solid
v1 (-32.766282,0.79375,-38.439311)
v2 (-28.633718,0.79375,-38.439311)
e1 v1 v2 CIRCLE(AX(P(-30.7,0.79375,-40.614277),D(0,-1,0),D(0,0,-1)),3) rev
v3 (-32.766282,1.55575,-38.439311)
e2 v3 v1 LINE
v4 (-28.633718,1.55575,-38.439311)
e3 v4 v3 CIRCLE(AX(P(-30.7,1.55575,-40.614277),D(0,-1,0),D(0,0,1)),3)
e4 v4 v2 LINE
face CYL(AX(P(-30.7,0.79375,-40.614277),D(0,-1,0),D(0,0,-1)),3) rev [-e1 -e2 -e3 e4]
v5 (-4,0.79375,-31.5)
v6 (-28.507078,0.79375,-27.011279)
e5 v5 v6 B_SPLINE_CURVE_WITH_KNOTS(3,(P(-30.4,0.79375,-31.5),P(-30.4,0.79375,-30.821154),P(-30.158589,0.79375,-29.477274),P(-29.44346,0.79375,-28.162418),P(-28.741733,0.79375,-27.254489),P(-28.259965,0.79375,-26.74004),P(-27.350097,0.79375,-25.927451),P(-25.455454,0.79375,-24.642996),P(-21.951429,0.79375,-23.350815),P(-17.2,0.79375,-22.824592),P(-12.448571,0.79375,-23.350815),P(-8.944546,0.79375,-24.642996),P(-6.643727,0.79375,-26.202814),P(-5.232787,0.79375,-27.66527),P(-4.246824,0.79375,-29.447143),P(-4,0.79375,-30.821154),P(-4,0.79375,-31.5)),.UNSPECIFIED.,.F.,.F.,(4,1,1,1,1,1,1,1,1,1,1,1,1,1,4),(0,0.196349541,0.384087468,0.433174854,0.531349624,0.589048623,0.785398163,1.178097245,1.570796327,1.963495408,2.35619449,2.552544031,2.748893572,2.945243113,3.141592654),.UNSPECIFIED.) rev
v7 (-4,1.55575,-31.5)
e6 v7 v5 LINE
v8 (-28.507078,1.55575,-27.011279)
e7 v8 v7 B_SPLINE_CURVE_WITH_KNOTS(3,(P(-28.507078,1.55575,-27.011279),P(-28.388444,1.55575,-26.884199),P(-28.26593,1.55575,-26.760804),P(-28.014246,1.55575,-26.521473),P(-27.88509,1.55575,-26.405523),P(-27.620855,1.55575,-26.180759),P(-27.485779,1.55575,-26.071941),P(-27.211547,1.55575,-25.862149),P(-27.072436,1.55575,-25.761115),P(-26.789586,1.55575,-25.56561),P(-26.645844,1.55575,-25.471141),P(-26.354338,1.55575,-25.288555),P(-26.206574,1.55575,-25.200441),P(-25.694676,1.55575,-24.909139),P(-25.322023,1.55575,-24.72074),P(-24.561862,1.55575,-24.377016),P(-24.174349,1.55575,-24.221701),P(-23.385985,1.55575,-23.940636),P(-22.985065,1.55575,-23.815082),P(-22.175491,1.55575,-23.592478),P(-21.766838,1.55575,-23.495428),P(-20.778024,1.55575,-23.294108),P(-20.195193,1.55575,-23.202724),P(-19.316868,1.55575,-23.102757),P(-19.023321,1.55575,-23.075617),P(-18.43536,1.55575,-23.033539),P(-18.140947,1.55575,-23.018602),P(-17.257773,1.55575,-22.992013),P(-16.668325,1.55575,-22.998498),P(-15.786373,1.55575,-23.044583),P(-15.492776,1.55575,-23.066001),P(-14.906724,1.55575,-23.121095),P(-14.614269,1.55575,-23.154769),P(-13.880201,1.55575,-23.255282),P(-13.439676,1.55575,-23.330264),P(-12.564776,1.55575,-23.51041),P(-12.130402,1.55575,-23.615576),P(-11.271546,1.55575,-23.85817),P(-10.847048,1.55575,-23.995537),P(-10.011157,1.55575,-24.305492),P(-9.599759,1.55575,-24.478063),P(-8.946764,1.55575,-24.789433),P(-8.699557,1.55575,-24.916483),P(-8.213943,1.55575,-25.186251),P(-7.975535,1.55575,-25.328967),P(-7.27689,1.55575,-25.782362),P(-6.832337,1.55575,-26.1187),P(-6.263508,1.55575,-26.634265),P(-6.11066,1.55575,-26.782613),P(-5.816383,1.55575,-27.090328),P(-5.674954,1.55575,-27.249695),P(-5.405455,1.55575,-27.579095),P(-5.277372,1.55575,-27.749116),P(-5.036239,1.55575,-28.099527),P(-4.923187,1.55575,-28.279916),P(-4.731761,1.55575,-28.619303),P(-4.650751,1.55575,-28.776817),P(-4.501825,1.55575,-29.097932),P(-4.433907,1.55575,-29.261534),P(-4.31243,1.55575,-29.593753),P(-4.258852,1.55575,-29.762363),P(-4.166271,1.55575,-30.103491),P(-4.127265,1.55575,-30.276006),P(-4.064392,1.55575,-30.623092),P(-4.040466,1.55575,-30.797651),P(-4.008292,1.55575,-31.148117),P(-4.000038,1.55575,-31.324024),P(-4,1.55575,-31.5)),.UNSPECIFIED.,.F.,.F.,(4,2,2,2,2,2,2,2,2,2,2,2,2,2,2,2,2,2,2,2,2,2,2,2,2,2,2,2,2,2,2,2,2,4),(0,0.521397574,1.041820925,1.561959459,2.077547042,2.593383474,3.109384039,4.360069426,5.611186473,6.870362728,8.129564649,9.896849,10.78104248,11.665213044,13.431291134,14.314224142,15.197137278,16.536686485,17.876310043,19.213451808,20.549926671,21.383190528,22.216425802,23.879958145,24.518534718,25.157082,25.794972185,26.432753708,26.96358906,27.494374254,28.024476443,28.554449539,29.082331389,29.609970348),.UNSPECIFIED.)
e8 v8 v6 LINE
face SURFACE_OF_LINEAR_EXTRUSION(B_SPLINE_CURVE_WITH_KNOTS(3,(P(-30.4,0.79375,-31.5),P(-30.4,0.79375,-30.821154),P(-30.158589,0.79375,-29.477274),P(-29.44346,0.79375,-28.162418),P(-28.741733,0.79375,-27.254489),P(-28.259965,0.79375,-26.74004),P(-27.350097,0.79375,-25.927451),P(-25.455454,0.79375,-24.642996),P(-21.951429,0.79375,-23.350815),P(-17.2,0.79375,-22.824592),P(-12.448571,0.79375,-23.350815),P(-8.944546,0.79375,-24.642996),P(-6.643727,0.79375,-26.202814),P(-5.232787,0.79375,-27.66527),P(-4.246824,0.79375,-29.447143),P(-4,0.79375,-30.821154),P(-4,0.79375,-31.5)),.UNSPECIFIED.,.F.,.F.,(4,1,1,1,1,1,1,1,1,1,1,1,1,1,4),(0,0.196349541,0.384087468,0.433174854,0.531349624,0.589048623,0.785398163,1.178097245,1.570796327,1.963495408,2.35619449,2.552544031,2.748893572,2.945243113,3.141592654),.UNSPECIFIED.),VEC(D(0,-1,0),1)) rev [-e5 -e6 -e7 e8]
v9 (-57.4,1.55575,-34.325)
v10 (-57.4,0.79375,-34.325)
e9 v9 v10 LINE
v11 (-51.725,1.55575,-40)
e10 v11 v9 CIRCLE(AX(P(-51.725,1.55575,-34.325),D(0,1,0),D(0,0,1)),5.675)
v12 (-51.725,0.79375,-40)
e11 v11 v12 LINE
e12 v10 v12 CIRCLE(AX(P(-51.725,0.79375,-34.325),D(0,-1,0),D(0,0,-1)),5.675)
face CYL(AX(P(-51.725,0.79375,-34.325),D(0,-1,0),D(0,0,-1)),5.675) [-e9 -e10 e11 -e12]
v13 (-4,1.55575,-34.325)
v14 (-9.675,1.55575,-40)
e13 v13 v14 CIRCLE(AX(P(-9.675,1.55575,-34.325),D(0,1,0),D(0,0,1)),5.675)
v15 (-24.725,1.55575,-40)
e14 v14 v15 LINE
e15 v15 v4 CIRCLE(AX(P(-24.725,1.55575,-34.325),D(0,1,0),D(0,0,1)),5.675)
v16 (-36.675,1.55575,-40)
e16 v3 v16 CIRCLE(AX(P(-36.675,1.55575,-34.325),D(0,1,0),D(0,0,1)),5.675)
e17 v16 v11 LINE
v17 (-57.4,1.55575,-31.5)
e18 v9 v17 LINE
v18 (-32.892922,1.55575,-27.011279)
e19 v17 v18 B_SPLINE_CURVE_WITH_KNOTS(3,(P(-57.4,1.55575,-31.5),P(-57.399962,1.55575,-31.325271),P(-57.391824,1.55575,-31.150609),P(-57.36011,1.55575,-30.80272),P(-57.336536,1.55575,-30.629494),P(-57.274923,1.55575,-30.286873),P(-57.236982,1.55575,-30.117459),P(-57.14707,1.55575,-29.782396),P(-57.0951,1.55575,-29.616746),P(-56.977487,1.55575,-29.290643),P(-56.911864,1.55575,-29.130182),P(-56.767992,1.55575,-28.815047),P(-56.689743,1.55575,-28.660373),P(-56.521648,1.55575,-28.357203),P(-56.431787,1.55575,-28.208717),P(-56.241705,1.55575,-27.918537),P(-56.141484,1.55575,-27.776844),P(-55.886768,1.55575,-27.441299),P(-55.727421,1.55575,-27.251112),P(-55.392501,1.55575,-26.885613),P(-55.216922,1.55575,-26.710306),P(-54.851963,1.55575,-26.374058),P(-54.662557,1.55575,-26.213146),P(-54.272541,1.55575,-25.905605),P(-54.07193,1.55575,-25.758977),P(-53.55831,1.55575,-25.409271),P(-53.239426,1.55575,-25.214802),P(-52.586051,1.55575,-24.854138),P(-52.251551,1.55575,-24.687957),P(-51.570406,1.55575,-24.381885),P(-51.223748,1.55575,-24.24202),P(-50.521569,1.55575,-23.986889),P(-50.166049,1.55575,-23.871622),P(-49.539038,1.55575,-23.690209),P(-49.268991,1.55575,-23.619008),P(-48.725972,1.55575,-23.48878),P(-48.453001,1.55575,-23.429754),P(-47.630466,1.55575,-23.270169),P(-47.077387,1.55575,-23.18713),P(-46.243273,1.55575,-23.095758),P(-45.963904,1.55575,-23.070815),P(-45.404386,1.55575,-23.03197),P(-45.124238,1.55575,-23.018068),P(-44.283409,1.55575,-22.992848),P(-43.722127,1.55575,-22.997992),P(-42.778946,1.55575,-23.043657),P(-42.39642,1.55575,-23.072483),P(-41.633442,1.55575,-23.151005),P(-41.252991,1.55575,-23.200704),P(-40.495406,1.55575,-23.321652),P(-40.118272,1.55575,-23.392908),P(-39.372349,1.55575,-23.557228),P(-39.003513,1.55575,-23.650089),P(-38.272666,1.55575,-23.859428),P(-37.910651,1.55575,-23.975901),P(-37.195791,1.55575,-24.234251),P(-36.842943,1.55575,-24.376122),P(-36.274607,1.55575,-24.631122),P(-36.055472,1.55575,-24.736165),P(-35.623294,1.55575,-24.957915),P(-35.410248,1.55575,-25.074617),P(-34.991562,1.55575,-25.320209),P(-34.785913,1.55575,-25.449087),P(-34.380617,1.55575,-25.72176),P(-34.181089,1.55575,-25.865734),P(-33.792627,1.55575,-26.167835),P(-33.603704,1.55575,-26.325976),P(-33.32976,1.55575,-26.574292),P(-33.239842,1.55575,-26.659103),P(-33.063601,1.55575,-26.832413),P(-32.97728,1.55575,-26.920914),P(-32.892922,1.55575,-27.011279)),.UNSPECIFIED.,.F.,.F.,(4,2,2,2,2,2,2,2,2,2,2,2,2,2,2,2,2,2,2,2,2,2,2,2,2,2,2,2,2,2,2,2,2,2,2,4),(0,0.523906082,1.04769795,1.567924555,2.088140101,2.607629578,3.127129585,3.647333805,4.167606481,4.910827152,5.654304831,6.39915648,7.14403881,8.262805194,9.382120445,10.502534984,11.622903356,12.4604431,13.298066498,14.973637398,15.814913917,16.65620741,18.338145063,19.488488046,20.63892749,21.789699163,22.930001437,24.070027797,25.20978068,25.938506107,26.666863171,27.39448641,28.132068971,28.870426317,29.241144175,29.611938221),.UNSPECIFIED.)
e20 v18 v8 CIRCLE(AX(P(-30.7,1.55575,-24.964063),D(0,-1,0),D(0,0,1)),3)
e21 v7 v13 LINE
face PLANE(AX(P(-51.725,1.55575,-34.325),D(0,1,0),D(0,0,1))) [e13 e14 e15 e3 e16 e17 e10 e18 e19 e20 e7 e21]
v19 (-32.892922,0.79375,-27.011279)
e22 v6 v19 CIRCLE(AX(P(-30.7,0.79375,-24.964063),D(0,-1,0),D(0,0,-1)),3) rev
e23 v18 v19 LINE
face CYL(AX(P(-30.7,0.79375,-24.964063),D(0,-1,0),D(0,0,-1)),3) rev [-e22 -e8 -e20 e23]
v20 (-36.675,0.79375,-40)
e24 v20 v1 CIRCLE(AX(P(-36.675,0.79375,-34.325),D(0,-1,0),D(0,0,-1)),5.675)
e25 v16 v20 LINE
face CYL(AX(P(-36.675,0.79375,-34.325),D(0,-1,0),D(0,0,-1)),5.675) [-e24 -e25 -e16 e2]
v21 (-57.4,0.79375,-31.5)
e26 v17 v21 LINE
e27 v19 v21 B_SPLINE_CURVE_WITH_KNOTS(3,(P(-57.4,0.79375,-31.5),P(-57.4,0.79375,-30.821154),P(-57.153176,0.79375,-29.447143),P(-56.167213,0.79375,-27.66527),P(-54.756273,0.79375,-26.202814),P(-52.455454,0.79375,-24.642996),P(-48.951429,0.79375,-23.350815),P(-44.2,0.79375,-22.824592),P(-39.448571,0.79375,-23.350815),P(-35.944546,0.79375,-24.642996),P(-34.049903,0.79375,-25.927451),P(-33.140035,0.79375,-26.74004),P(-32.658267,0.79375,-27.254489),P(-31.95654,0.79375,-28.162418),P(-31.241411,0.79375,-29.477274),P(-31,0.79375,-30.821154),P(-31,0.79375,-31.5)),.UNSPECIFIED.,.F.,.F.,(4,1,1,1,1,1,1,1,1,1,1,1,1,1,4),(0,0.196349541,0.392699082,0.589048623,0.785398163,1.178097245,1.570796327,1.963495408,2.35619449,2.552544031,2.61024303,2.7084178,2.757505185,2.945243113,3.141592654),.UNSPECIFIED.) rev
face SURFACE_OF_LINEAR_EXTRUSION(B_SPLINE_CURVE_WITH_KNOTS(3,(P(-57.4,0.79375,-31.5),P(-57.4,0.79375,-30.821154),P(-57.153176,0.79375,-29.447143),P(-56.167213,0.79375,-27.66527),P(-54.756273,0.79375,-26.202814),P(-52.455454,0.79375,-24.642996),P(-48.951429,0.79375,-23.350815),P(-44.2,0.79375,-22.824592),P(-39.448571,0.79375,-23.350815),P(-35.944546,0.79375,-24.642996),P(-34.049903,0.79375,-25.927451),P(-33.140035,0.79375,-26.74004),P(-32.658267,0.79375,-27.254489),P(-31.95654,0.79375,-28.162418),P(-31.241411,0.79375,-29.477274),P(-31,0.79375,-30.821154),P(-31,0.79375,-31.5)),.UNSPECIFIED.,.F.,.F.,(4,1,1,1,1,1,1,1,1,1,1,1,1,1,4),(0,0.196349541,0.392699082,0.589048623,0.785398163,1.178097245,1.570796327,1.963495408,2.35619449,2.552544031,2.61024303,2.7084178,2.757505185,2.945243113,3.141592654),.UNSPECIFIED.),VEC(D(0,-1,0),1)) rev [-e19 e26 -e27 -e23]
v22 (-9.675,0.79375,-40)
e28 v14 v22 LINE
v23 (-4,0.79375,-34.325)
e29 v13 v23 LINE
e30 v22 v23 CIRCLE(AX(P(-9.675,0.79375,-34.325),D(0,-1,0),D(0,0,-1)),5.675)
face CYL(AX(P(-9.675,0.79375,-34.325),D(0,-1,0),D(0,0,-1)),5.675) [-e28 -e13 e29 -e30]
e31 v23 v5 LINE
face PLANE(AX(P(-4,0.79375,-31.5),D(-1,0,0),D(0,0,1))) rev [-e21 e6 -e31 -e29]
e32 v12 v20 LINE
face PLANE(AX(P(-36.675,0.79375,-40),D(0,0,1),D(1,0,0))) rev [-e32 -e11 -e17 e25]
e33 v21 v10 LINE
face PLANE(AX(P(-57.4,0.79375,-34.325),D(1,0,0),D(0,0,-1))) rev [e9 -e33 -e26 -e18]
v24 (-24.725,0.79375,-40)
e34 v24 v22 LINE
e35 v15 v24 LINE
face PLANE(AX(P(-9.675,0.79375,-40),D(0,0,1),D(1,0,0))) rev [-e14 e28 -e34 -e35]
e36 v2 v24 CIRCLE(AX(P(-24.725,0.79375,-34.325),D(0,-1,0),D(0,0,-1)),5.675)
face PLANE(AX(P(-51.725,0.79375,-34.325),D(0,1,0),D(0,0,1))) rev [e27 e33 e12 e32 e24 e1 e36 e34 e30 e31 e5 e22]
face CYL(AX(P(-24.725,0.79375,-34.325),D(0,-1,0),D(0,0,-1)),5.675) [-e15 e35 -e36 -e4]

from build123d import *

# Parameters (mm, degrees)
SKETCH4_W                      = 118.3
SKETCH4_H                      = 40.5
BOSS_EXTRUDE1_DEPTH            = 12.7
CUT_EXTRUDE1_DEPTH             = 75.078168174
FILLET1_R                      = 3.175
LPATTERN1_COUNT                = 2
LPATTERN1_PITCH                = 27
FILLET1_OF_LPATTERN1_R         = 3.175
MIRROR1_DEPTH                  = 12.7
SKETCH8_R                      = 0.85
CUT_EXTRUDE2_DEPTH             = 75.078168329
MIRROR3_COPY_1_SKETCH_R        = 0.85
MIRROR3_COPY_1_DEPTH           = 75.078168329
SKETCH14_W                     = 118.3
SKETCH14_H                     = 0.96
SKETCH14_W_2                   = 4.5
SKETCH14_H_2                   = 40.5
CUT_EXTRUDE7_DEPTH             = 0.1
CUT_EXTRUDE8_DEPTH             = 2.35
MIRROR14_COPY_1_DEPTH          = 2.35
MIRROR16_COPY_1_DEPTH          = 2.35
MIRROR16_COPY_2_DEPTH          = 2.35
MIRROR16_COPY_3_DEPTH          = 2.35
CUT_EXTRUDE10_DEPTH            = 75.061089804
SKETCH20_W                     = 127.8
SKETCH20_H                     = 85.5
BOSS_EXTRUDE2_DEPTH            = 3.175
SKETCH22_W                     = 127.8
SKETCH22_H                     = 85.5
CUT_EXTRUDE11_DEPTH            = 78.923440062
CUT_EXTRUDE12_DEPTH            = 77.947080029
F_0_80_TAPPED_HOLE1_D          = 1.19126
MIRROR19_COPY_1_DEPTH          = 77.947080029
MIRROR19_COPY_2_D              = 1.19126
SKETCH26_W                     = 127.8
SKETCH26_H                     = 0.96
CUT_EXTRUDE13_DEPTH            = 3.175
SKETCH27_W                     = 127.8
SKETCH27_H                     = 0.96
CUT_EXTRUDE14_DEPTH            = 3.175
SKETCH29_W                     = 3.175
SKETCH29_H                     = 19.77
CUT_EXTRUDE15_DEPTH            = 0.82
F_0_80_TAPPED_HOLE2_AT_2_COUNT = 2
F_0_80_TAPPED_HOLE2_AT_2_PITCH = 10
SKETCH36_R                     = 0.8
CUT_EXTRUDE16_DEPTH            = 10
FILLET2_R                      = 1.5
FILLET3_R                      = 1.5
F_0_80_TAPPED_HOLE5_AT_2_COUNT = 2
F_0_80_TAPPED_HOLE5_AT_2_PITCH = 10
BOSS_EXTRUDE3_DEPTH            = 0.79375
SKETCH39_W                     = 144.663992048
SKETCH39_H                     = 99.796260463
CUT_EXTRUDE17_DEPTH            = 10
BOSS_EXTRUDE4_DEPTH            = 0.762
SKETCH42_W                     = 65.404927097
SKETCH42_H                     = 32.798348424
CUT_EXTRUDE18_DEPTH            = 10.762


# Read off the part's stored shape, not the designer's step: Mirror1
with BuildPart() as part:
    # Sketch4 → Boss-Extrude1 (new body)
    with BuildSketch(Plane(origin=(0, 0, 0), x_dir=(1, 0, 0), z_dir=(0, 1, 0))):
        with Locations((0, 22.5)):
            Rectangle(SKETCH4_W, SKETCH4_H)
    extrude(amount=BOSS_EXTRUDE1_DEPTH)

    # Sketch5 → Cut-Extrude1 (cut, through all)
    with BuildSketch(Plane(origin=(0, 12.7, 0), x_dir=(1, 0, 0), z_dir=(0, 1, 0))):
        with BuildLine():
            Line((-54.9, 13.5), (-54.9, 7.5))
            Line((-54.9, 7.5), (-33.5, 7.5))
            Line((-33.5, 7.5), (-33.5, 13.5))
            add(Edge.make_bspline(
                [(-33.5, 13.5), (-33.5, 19.5), (-44.2, 19.5), (-54.9, 19.5), (-54.9, 13.5)],
                knots=[3.141592654, 3.141592654, 3.141592654, 4.71238898, 4.71238898, 6.283185307, 6.283185307, 6.283185307], degree=2, weights=[1, 0.707106781, 1, 0.707106781, 1]))
        make_face()
        with BuildLine():
            Line((-54.9, 37.5), (-33.5, 37.5))
            Line((-33.5, 37.5), (-33.5, 31.5))
            add(Edge.make_bspline(
                [(-54.9, 31.5), (-54.9, 25.5), (-44.2, 25.5), (-33.5, 25.5), (-33.5, 31.5)],
                knots=[0, 0, 0, 1.570796327, 1.570796327, 3.141592654, 3.141592654, 3.141592654], degree=2, weights=[1, 0.707106781, 1, 0.707106781, 1]))
            Line((-54.9, 31.5), (-54.9, 37.5))
        make_face()
    cut_extrude1 = extrude(amount=-CUT_EXTRUDE1_DEPTH, mode=Mode.SUBTRACT)

    # Fillet1
    fillet1_edges = [part.edges().sort_by_distance(p)[0] for p in [
        (-33.5, 6.35, -7.5),
        (-54.9, 6.35, -7.5),
        (-54.9, 6.35, -37.5),
        (-33.5, 6.35, -37.5),
    ]]
    fillet(fillet1_edges, radius=FILLET1_R)

    # LPattern1: Cut-Extrude1 ×2
    with Locations(*[(i * LPATTERN1_PITCH, 0, 0) for i in range(1, LPATTERN1_COUNT)]):
        add(cut_extrude1, mode=Mode.SUBTRACT)

    # Fillet1 of LPattern1
    fillet1_of_lpattern1_edges = [part.edges().sort_by_distance(p)[0] for p in [
        (-6.5, 6.35, -7.5),
        (-27.9, 6.35, -7.5),
        (-27.9, 6.35, -37.5),
        (-6.5, 6.35, -37.5),
    ]]
    fillet(fillet1_of_lpattern1_edges, radius=FILLET1_OF_LPATTERN1_R)

    # Mirror1 outline → Mirror1 (cut)
    with BuildSketch(Plane(origin=(0, 0, 0), x_dir=(1, 0, 0), z_dir=(0, 1, 0))):
        with BuildLine():
            add(Edge.make_bspline(
                [(33.5, 13.5), (33.5, 19.5), (44.2, 19.5), (54.9, 19.5), (54.9, 13.5)],
                knots=[3.141592654, 3.141592654, 3.141592654, 4.71238898, 4.71238898, 6.283185307, 6.283185307, 6.283185307], degree=2, weights=[1, 0.707106781, 1, 0.707106781, 1]))
            Line((33.5, 13.5), (33.5, 10.675))
            ThreePointArc((33.5, 10.675), (34.42993597, 8.42993597), (36.675, 7.5))
            Line((36.675, 7.5), (51.725, 7.5))
            ThreePointArc((51.725, 7.5), (53.97006403, 8.42993597), (54.9, 10.675))
            Line((54.9, 10.675), (54.9, 13.5))
        make_face()
        with BuildLine():
            add(Edge.make_bspline(
                [(54.9, 31.5), (54.9, 25.5), (44.2, 25.5), (33.5, 25.5), (33.5, 31.5)],
                knots=[0, 0, 0, 1.570796327, 1.570796327, 3.141592654, 3.141592654, 3.141592654], degree=2, weights=[1, 0.707106781, 1, 0.707106781, 1]))
            Line((54.9, 31.5), (54.9, 34.325))
            ThreePointArc((54.9, 34.325), (53.97006403, 36.57006403), (51.725, 37.5))
            Line((51.725, 37.5), (36.675, 37.5))
            ThreePointArc((36.675, 37.5), (34.42993597, 36.57006403), (33.5, 34.325))
            Line((33.5, 34.325), (33.5, 31.5))
        make_face()
        with BuildLine():
            add(Edge.make_bspline(
                [(6.5, 13.5), (6.5, 19.5), (17.2, 19.5), (27.9, 19.5), (27.9, 13.5)],
                knots=[3.141592654, 3.141592654, 3.141592654, 4.71238898, 4.71238898, 6.283185307, 6.283185307, 6.283185307], degree=2, weights=[1, 0.707106781, 1, 0.707106781, 1]))
            Line((6.5, 13.5), (6.5, 10.675))
            ThreePointArc((6.5, 10.675), (7.42993597, 8.42993597), (9.675, 7.5))
            Line((9.675, 7.5), (24.725, 7.5))
            ThreePointArc((24.725, 7.5), (26.97006403, 8.42993597), (27.9, 10.675))
            Line((27.9, 10.675), (27.9, 13.5))
        make_face()
        with BuildLine():
            add(Edge.make_bspline(
                [(27.9, 31.5), (27.9, 25.5), (17.2, 25.5), (6.5, 25.5), (6.5, 31.5)],
                knots=[0, 0, 0, 1.570796327, 1.570796327, 3.141592654, 3.141592654, 3.141592654], degree=2, weights=[1, 0.707106781, 1, 0.707106781, 1]))
            Line((27.9, 31.5), (27.9, 34.325))
            ThreePointArc((27.9, 34.325), (26.97006403, 36.57006403), (24.725, 37.5))
            Line((24.725, 37.5), (9.675, 37.5))
            ThreePointArc((9.675, 37.5), (7.42993597, 36.57006403), (6.5, 34.325))
            Line((6.5, 34.325), (6.5, 31.5))
        make_face()
    extrude(amount=MIRROR1_DEPTH, mode=Mode.SUBTRACT)

    # Sketch8 → Cut-Extrude2 (cut, through all)
    with BuildSketch(Plane(origin=(0, 12.7, 0), x_dir=(1, 0, 0), z_dir=(0, 1, 0))):
        with Locations(Location((-57.15, 40.75, 0), (0, 0, 270))):
            Circle(SKETCH8_R)
        with Locations(Location((-30.7, 40.75, 0), (0, 0, 270))):
            Circle(SKETCH8_R)
        with Locations(Location((-4.25, 40.75, 0), (0, 0, 270))):
            Circle(SKETCH8_R)
        with Locations(Location((-4.25, 24.98, 0), (0, 0, 270))):
            Circle(SKETCH8_R)
        with Locations(Location((-30.7, 24.98, 0), (0, 0, 270))):
            Circle(SKETCH8_R)
        with Locations(Location((-57.15, 24.98, 0), (0, 0, 270))):
            Circle(SKETCH8_R)
    cut_extrude2 = extrude(amount=-CUT_EXTRUDE2_DEPTH, mode=Mode.SUBTRACT)

    # Mirror2: Cut-Extrude2 across plane
    add(cut_extrude2.mirror(Plane.XY.offset(-22.5)), mode=Mode.SUBTRACT)

    # Mirror3: Cut-Extrude2 across plane
    add(cut_extrude2.mirror(Plane(origin=(0, 0, 0), x_dir=(0, 0, 1), z_dir=(1, 0, 0))), mode=Mode.SUBTRACT)

    # Mirror3 copy 1 sketch → Mirror3 copy 1 (cut, through all)
    with BuildSketch(Plane(origin=(0, 12.7, -45), x_dir=(-1, 0, 0), z_dir=(0, 1, 0))):
        with Locations(Location((-57.15, 40.75, 0), (0, 0, 270))):
            Circle(MIRROR3_COPY_1_SKETCH_R)
        with Locations(Location((-30.7, 40.75, 0), (0, 0, 270))):
            Circle(MIRROR3_COPY_1_SKETCH_R)
        with Locations(Location((-4.25, 40.75, 0), (0, 0, 270))):
            Circle(MIRROR3_COPY_1_SKETCH_R)
        with Locations(Location((-4.25, 24.98, 0), (0, 0, 270))):
            Circle(MIRROR3_COPY_1_SKETCH_R)
        with Locations(Location((-30.7, 24.98, 0), (0, 0, 270))):
            Circle(MIRROR3_COPY_1_SKETCH_R)
        with Locations(Location((-57.15, 24.98, 0), (0, 0, 270))):
            Circle(MIRROR3_COPY_1_SKETCH_R)
    extrude(amount=-MIRROR3_COPY_1_DEPTH, mode=Mode.SUBTRACT)

    # Sketch14 → Cut-Extrude7 (cut)
    with BuildSketch(Plane(origin=(0, 12.7, 0), x_dir=(1, 0, 0), z_dir=(0, 1, 0))):
        with Locations((0, 22.5)):
            Rectangle(SKETCH14_W, SKETCH14_H)
        with Locations((0, 22.5)):
            Rectangle(SKETCH14_W_2, SKETCH14_H_2)
    extrude(amount=-CUT_EXTRUDE7_DEPTH, mode=Mode.SUBTRACT)

    # Sketch15 → Cut-Extrude8 (cut)
    with BuildSketch(Plane(origin=(0, 12.7, 0), x_dir=(1, 0, 0), z_dir=(0, 1, 0))):
        with BuildLine():
            Line((-33.875, 42.75), (-27.525, 42.75))
            Line((-27.525, 42.75), (-27.525, 41.5))
            ThreePointArc((-27.525, 41.5), (-30.7, 38.325), (-33.875, 41.5))
            Line((-33.875, 41.5), (-33.875, 42.75))
        make_face()
        with BuildLine():
            Line((-2.25, 42.75), (-6.675, 42.75))
            Line((-6.675, 42.75), (-6.675, 41.5))
            ThreePointArc((-6.675, 41.5), (-5.74506403, 39.25493597), (-3.5, 38.325))
            Line((-3.5, 38.325), (-2.25, 38.325))
            Line((-2.25, 38.325), (-2.25, 42.75))
        make_face()
        with BuildLine():
            Line((-59.15, 42.75), (-54.725, 42.75))
            Line((-54.725, 42.75), (-54.725, 41.5))
            ThreePointArc((-54.725, 41.5), (-55.65493597, 39.25493597), (-57.9, 38.325))
            Line((-57.9, 38.325), (-59.15, 38.325))
            Line((-59.15, 38.325), (-59.15, 42.75))
        make_face()
    cut_extrude8 = extrude(amount=-CUT_EXTRUDE8_DEPTH, mode=Mode.SUBTRACT)

    # Mirror6: Cut-Extrude8 across plane
    add(cut_extrude8.mirror(Plane(origin=(0, 0, -32.865), x_dir=(1, 0, 0), z_dir=(0, 0, -1))), mode=Mode.SUBTRACT)

    # Mirror14: Cut-Extrude8 across plane
    add(cut_extrude8.mirror(Plane(origin=(0, 0, 0), x_dir=(0, 0, 1), z_dir=(1, 0, 0))), mode=Mode.SUBTRACT)

    # Mirror14 copy 1 sketch → Mirror14 copy 1 (cut)
    with BuildSketch(Plane(origin=(0, 12.7, -65.73), x_dir=(-1, 0, 0), z_dir=(0, 1, 0))):
        with BuildLine():
            Line((-33.875, 42.75), (-27.525, 42.75))
            Line((-27.525, 42.75), (-27.525, 41.5))
            ThreePointArc((-27.525, 41.5), (-30.7, 38.325), (-33.875, 41.5))
            Line((-33.875, 41.5), (-33.875, 42.75))
        make_face()
        with BuildLine():
            Line((-2.25, 42.75), (-6.675, 42.75))
            Line((-6.675, 42.75), (-6.675, 41.5))
            ThreePointArc((-6.675, 41.5), (-5.74506403, 39.25493597), (-3.5, 38.325))
            Line((-3.5, 38.325), (-2.25, 38.325))
            Line((-2.25, 38.325), (-2.25, 42.75))
        make_face()
        with BuildLine():
            Line((-59.15, 42.75), (-54.725, 42.75))
            Line((-54.725, 42.75), (-54.725, 41.5))
            ThreePointArc((-54.725, 41.5), (-55.65493597, 39.25493597), (-57.9, 38.325))
            Line((-57.9, 38.325), (-59.15, 38.325))
            Line((-59.15, 38.325), (-59.15, 42.75))
        make_face()
    extrude(amount=-MIRROR14_COPY_1_DEPTH, mode=Mode.SUBTRACT)

    # Mirror16: Cut-Extrude8 across plane
    add(cut_extrude8.mirror(Plane.XY.offset(-22.5)), mode=Mode.SUBTRACT)

    # Mirror16 copy 1 sketch → Mirror16 copy 1 (cut)
    with BuildSketch(Plane(origin=(0, 12.7, 20.73), x_dir=(1, 0, 0), z_dir=(0, 1, 0))):
        with BuildLine():
            Line((-33.875, 42.75), (-27.525, 42.75))
            Line((-27.525, 42.75), (-27.525, 41.5))
            ThreePointArc((-27.525, 41.5), (-30.7, 38.325), (-33.875, 41.5))
            Line((-33.875, 41.5), (-33.875, 42.75))
        make_face()
        with BuildLine():
            Line((-2.25, 42.75), (-6.675, 42.75))
            Line((-6.675, 42.75), (-6.675, 41.5))
            ThreePointArc((-6.675, 41.5), (-5.74506403, 39.25493597), (-3.5, 38.325))
            Line((-3.5, 38.325), (-2.25, 38.325))
            Line((-2.25, 38.325), (-2.25, 42.75))
        make_face()
        with BuildLine():
            Line((-59.15, 42.75), (-54.725, 42.75))
            Line((-54.725, 42.75), (-54.725, 41.5))
            ThreePointArc((-54.725, 41.5), (-55.65493597, 39.25493597), (-57.9, 38.325))
            Line((-57.9, 38.325), (-59.15, 38.325))
            Line((-59.15, 38.325), (-59.15, 42.75))
        make_face()
    extrude(amount=-MIRROR16_COPY_1_DEPTH, mode=Mode.SUBTRACT)

    # Mirror16 copy 2 sketch → Mirror16 copy 2 (cut)
    with BuildSketch(Plane(origin=(0, 12.7, -45), x_dir=(-1, 0, 0), z_dir=(0, 1, 0))):
        with BuildLine():
            Line((-33.875, 42.75), (-27.525, 42.75))
            Line((-27.525, 42.75), (-27.525, 41.5))
            ThreePointArc((-27.525, 41.5), (-30.7, 38.325), (-33.875, 41.5))
            Line((-33.875, 41.5), (-33.875, 42.75))
        make_face()
        with BuildLine():
            Line((-2.25, 42.75), (-6.675, 42.75))
            Line((-6.675, 42.75), (-6.675, 41.5))
            ThreePointArc((-6.675, 41.5), (-5.74506403, 39.25493597), (-3.5, 38.325))
            Line((-3.5, 38.325), (-2.25, 38.325))
            Line((-2.25, 38.325), (-2.25, 42.75))
        make_face()
        with BuildLine():
            Line((-59.15, 42.75), (-54.725, 42.75))
            Line((-54.725, 42.75), (-54.725, 41.5))
            ThreePointArc((-54.725, 41.5), (-55.65493597, 39.25493597), (-57.9, 38.325))
            Line((-57.9, 38.325), (-59.15, 38.325))
            Line((-59.15, 38.325), (-59.15, 42.75))
        make_face()
    extrude(amount=-MIRROR16_COPY_2_DEPTH, mode=Mode.SUBTRACT)

    # Mirror16 copy 3 sketch → Mirror16 copy 3 (cut)
    with BuildSketch(Plane(origin=(0, 12.7, 20.73), x_dir=(-1, 0, 0), z_dir=(0, 1, 0))):
        with BuildLine():
            Line((-33.875, -42.75), (-27.525, -42.75))
            Line((-27.525, -42.75), (-27.525, -41.5))
            ThreePointArc((-27.525, -41.5), (-30.7, -38.325), (-33.875, -41.5))
            Line((-33.875, -41.5), (-33.875, -42.75))
        make_face()
        with BuildLine():
            Line((-2.25, -42.75), (-6.675, -42.75))
            Line((-6.675, -42.75), (-6.675, -41.5))
            ThreePointArc((-6.675, -41.5), (-5.74506403, -39.25493597), (-3.5, -38.325))
            Line((-3.5, -38.325), (-2.25, -38.325))
            Line((-2.25, -38.325), (-2.25, -42.75))
        make_face()
        with BuildLine():
            Line((-59.15, -42.75), (-54.725, -42.75))
            Line((-54.725, -42.75), (-54.725, -41.5))
            ThreePointArc((-54.725, -41.5), (-55.65493597, -39.25493597), (-57.9, -38.325))
            Line((-57.9, -38.325), (-59.15, -38.325))
            Line((-59.15, -38.325), (-59.15, -42.75))
        make_face()
    extrude(amount=-MIRROR16_COPY_3_DEPTH, mode=Mode.SUBTRACT)

    # Sketch17 → Cut-Extrude10 (cut, through all)
    with BuildSketch(Plane(origin=(0, 12.6, 0), x_dir=(1, 0, 0), z_dir=(0, 1, 0))):
        Polygon((-54.725, 22.98), (-59.15, 22.98), (-59.15, 22.02), (-54.725, 22.02), (-33.875, 22.02), (-27.525, 22.02), (-6.675, 22.02), (-2.25, 22.02), (-2.25, 17.595), (-2.25, 6.675), (-2.25, 2.25), (2.25, 2.25), (2.25, 6.675), (2.25, 17.595), (2.25, 22.02), (6.675, 22.02), (27.525, 22.02), (33.875, 22.02), (54.725, 22.02), (59.15, 22.02), (59.15, 22.98), (54.725, 22.98), (33.875, 22.98), (27.525, 22.98), (6.675, 22.98), (2.25, 22.98), (2.25, 27.405), (2.25, 38.325), (2.25, 42.75), (-2.25, 42.75), (-2.25, 38.325), (-2.25, 27.405), (-2.25, 22.98), (-6.675, 22.98), (-27.525, 22.98), (-33.875, 22.98), align=None)
    extrude(amount=-CUT_EXTRUDE10_DEPTH, mode=Mode.SUBTRACT)


with BuildPart() as cut_extrude10_piece_1:
    # of the separate pieces the step leaves, piece 1, a body of its own (cut_extrude10_pieces)
    add(part.part.solids().sort_by_distance((59.15, 0, -22.02))[0])



with BuildPart() as cut_extrude10_piece_2:
    # of the separate pieces the step leaves, piece 2, a body of its own (cut_extrude10_pieces)
    add(part.part.solids().sort_by_distance((2.25, 0, -42.75))[0])


with BuildPart() as cut_extrude10_piece_3:
    # of the separate pieces the step leaves, piece 3, a body of its own (cut_extrude10_pieces)
    add(part.part.solids().sort_by_distance((-59.15, 0, -2.25))[0])


with BuildPart() as cut_extrude10_piece_4:
    # of the separate pieces the step leaves, piece 4, a body of its own (cut_extrude10_pieces)
    add(part.part.solids().sort_by_distance((-59.15, 0, -22.98))[0])


with BuildPart() as cut_extrude10_piece_1_1:
    add(cut_extrude10_piece_1.part)

    add(cut_extrude10_piece_2.part)  # Boss-Extrude2 merges Cut-Extrude10 piece 2

    add(cut_extrude10_piece_3.part)  # Boss-Extrude2 merges Cut-Extrude10 piece 3

    add(cut_extrude10_piece_4.part)  # Boss-Extrude2 merges Cut-Extrude10 piece 4
    # Sketch20 → Boss-Extrude2 (add)
    with BuildSketch(Plane(origin=(0, 0, 0), x_dir=(1, 0, 0), z_dir=(0, 1, 0))):
        Rectangle(SKETCH20_W, SKETCH20_H)
    extrude(amount=-BOSS_EXTRUDE2_DEPTH)

    # Sketch22 → Cut-Extrude11 (cut, through all)
    with BuildSketch(Plane(origin=(0, 0, 0), x_dir=(1, 0, 0), z_dir=(0, 1, 0))):
        Rectangle(SKETCH22_W, SKETCH22_H)
    extrude(amount=CUT_EXTRUDE11_DEPTH, mode=Mode.SUBTRACT)

    # Sketch23 → Cut-Extrude12 (cut, through all)
    with BuildSketch(Plane(origin=(0, 0, 0), x_dir=(1, 0, 0), z_dir=(0, 1, 0))):
        with BuildLine():
            Line((-36.675, 37.5), (-51.725, 37.5))
            ThreePointArc((-51.725, 37.5), (-53.97006403, 36.57006403), (-54.9, 34.325))
            Line((-54.9, 34.325), (-54.9, 31.5))
            add(Edge.make_bspline(
                [(-54.9, 31.5), (-54.9, 25.5), (-44.2, 25.5), (-33.5, 25.5), (-33.5, 31.5)],
                knots=[0, 0, 0, 1.570796327, 1.570796327, 3.141592654, 3.141592654, 3.141592654], degree=2, weights=[1, 0.707106781, 1, 0.707106781, 1]))
            Line((-33.5, 31.5), (-33.5, 34.325))
            ThreePointArc((-33.5, 34.325), (-34.42993597, 36.57006403), (-36.675, 37.5))
        make_face()
        with BuildLine():
            Line((-9.675, 37.5), (-24.725, 37.5))
            ThreePointArc((-24.725, 37.5), (-26.97006403, 36.57006403), (-27.9, 34.325))
            Line((-27.9, 34.325), (-27.9, 31.5))
            add(Edge.make_bspline(
                [(-27.9, 31.5), (-27.9, 25.5), (-17.2, 25.5), (-6.5, 25.5), (-6.5, 31.5)],
                knots=[0, 0, 0, 1.570796327, 1.570796327, 3.141592654, 3.141592654, 3.141592654], degree=2, weights=[1, 0.707106781, 1, 0.707106781, 1]))
            Line((-6.5, 31.5), (-6.5, 34.325))
            ThreePointArc((-6.5, 34.325), (-7.42993597, 36.57006403), (-9.675, 37.5))
        make_face()
        with BuildLine():
            Line((-54.9, 13.5), (-54.9, 10.675))
            ThreePointArc((-54.9, 10.675), (-53.97006403, 8.42993597), (-51.725, 7.5))
            Line((-51.725, 7.5), (-36.675, 7.5))
            ThreePointArc((-36.675, 7.5), (-34.42993597, 8.42993597), (-33.5, 10.675))
            Line((-33.5, 10.675), (-33.5, 13.5))
            add(Edge.make_bspline(
                [(-33.5, 13.5), (-33.5, 19.5), (-44.2, 19.5), (-54.9, 19.5), (-54.9, 13.5)],
                knots=[3.141592654, 3.141592654, 3.141592654, 4.71238898, 4.71238898, 6.283185307, 6.283185307, 6.283185307], degree=2, weights=[1, 0.707106781, 1, 0.707106781, 1]))
        make_face()
        with BuildLine():
            Line((-27.9, 13.5), (-27.9, 10.675))
            ThreePointArc((-27.9, 10.675), (-26.97006403, 8.42993597), (-24.725, 7.5))
            Line((-24.725, 7.5), (-9.675, 7.5))
            ThreePointArc((-9.675, 7.5), (-7.42993597, 8.42993597), (-6.5, 10.675))
            Line((-6.5, 10.675), (-6.5, 13.5))
            add(Edge.make_bspline(
                [(-6.5, 13.5), (-6.5, 19.5), (-17.2, 19.5), (-27.9, 19.5), (-27.9, 13.5)],
                knots=[3.141592654, 3.141592654, 3.141592654, 4.71238898, 4.71238898, 6.283185307, 6.283185307, 6.283185307], degree=2, weights=[1, 0.707106781, 1, 0.707106781, 1]))
        make_face()
    cut_extrude12 = extrude(amount=-CUT_EXTRUDE12_DEPTH, mode=Mode.SUBTRACT)

    # #0-80 Tapped Hole1 (through all)
    with Locations(Plane(origin=(0, 0, 0), x_dir=(1, 0, 0), z_dir=(0, 1, 0))):
        with Locations((-57.15, 40.75), (-30.7, 40.75), (-4.25, 40.75), (-4.25, 24.98), (-30.7, 24.98), (-30.7, 20.02), (-57.15, 24.98), (-57.15, 20.02), (-4.25, 20.02), (-4.25, 4.25), (-30.7, 4.25), (-57.15, 4.25)):
            f_0_80_tapped_hole1 = Hole(F_0_80_TAPPED_HOLE1_D / 2)

    # Mirror18: Cut-Extrude12, #0-80 Tapped Hole1 across plane
    add(cut_extrude12.mirror(Plane(origin=(0, 0, 0), x_dir=(0, 0, 1), z_dir=(1, 0, 0))), mode=Mode.SUBTRACT)
    add(f_0_80_tapped_hole1.mirror(Plane(origin=(0, 0, 0), x_dir=(0, 0, 1), z_dir=(1, 0, 0))), mode=Mode.SUBTRACT)

    # Mirror19: Cut-Extrude12, #0-80 Tapped Hole1 across plane
    add(cut_extrude12.mirror(Plane(origin=(0, 0, 0), x_dir=(1, 0, 0), z_dir=(0, 0, -1))), mode=Mode.SUBTRACT)
    add(f_0_80_tapped_hole1.mirror(Plane(origin=(0, 0, 0), x_dir=(1, 0, 0), z_dir=(0, 0, -1))), mode=Mode.SUBTRACT)

    # Mirror19 copy 1 sketch → Mirror19 copy 1 (cut, through all)
    with BuildSketch(Plane(origin=(0, 0, 0), x_dir=(-1, 0, 0), z_dir=(0, 1, 0))):
        with BuildLine():
            Line((-36.675, 37.5), (-51.725, 37.5))
            ThreePointArc((-51.725, 37.5), (-53.97006403, 36.57006403), (-54.9, 34.325))
            Line((-54.9, 34.325), (-54.9, 31.5))
            add(Edge.make_bspline(
                [(-54.9, 31.5), (-54.9, 25.5), (-44.2, 25.5), (-33.5, 25.5), (-33.5, 31.5)],
                knots=[0, 0, 0, 1.570796327, 1.570796327, 3.141592654, 3.141592654, 3.141592654], degree=2, weights=[1, 0.707106781, 1, 0.707106781, 1]))
            Line((-33.5, 31.5), (-33.5, 34.325))
            ThreePointArc((-33.5, 34.325), (-34.42993597, 36.57006403), (-36.675, 37.5))
        make_face()
        with BuildLine():
            Line((-9.675, 37.5), (-24.725, 37.5))
            ThreePointArc((-24.725, 37.5), (-26.97006403, 36.57006403), (-27.9, 34.325))
            Line((-27.9, 34.325), (-27.9, 31.5))
            add(Edge.make_bspline(
                [(-27.9, 31.5), (-27.9, 25.5), (-17.2, 25.5), (-6.5, 25.5), (-6.5, 31.5)],
                knots=[0, 0, 0, 1.570796327, 1.570796327, 3.141592654, 3.141592654, 3.141592654], degree=2, weights=[1, 0.707106781, 1, 0.707106781, 1]))
            Line((-6.5, 31.5), (-6.5, 34.325))
            ThreePointArc((-6.5, 34.325), (-7.42993597, 36.57006403), (-9.675, 37.5))
        make_face()
        with BuildLine():
            Line((-54.9, 13.5), (-54.9, 10.675))
            ThreePointArc((-54.9, 10.675), (-53.97006403, 8.42993597), (-51.725, 7.5))
            Line((-51.725, 7.5), (-36.675, 7.5))
            ThreePointArc((-36.675, 7.5), (-34.42993597, 8.42993597), (-33.5, 10.675))
            Line((-33.5, 10.675), (-33.5, 13.5))
            add(Edge.make_bspline(
                [(-33.5, 13.5), (-33.5, 19.5), (-44.2, 19.5), (-54.9, 19.5), (-54.9, 13.5)],
                knots=[3.141592654, 3.141592654, 3.141592654, 4.71238898, 4.71238898, 6.283185307, 6.283185307, 6.283185307], degree=2, weights=[1, 0.707106781, 1, 0.707106781, 1]))
        make_face()
        with BuildLine():
            Line((-27.9, 13.5), (-27.9, 10.675))
            ThreePointArc((-27.9, 10.675), (-26.97006403, 8.42993597), (-24.725, 7.5))
            Line((-24.725, 7.5), (-9.675, 7.5))
            ThreePointArc((-9.675, 7.5), (-7.42993597, 8.42993597), (-6.5, 10.675))
            Line((-6.5, 10.675), (-6.5, 13.5))
            add(Edge.make_bspline(
                [(-6.5, 13.5), (-6.5, 19.5), (-17.2, 19.5), (-27.9, 19.5), (-27.9, 13.5)],
                knots=[3.141592654, 3.141592654, 3.141592654, 4.71238898, 4.71238898, 6.283185307, 6.283185307, 6.283185307], degree=2, weights=[1, 0.707106781, 1, 0.707106781, 1]))
        make_face()
    extrude(amount=-MIRROR19_COPY_1_DEPTH, mode=Mode.SUBTRACT)

    # Mirror19 copy 2 (through all)
    with Locations(Plane(origin=(0, 0, 0), x_dir=(-1, 0, 0), z_dir=(0, 1, 0))):
        with Locations((-57.15, 40.75), (-30.7, 40.75), (-4.25, 40.75), (-4.25, 24.98), (-30.7, 24.98), (-30.7, 20.02), (-57.15, 24.98), (-57.15, 20.02), (-4.25, 20.02), (-4.25, 4.25), (-30.7, 4.25), (-57.15, 4.25)):
            Hole(MIRROR19_COPY_2_D / 2)

    # Sketch26 → Cut-Extrude13 (cut)
    with BuildSketch(Plane(origin=(0, 0, 0), x_dir=(1, 0, 0), z_dir=(0, 1, 0))):
        with Locations((0, 22.5)):
            Rectangle(SKETCH26_W, SKETCH26_H)
    extrude(amount=-CUT_EXTRUDE13_DEPTH, mode=Mode.SUBTRACT)


with BuildPart() as cut_extrude13_piece_1:
    # of the separate pieces the step leaves, piece 1, a body of its own (cut_extrude13_pieces)
    add(cut_extrude10_piece_1_1.part.solids().sort_by_distance((63.9, 0, -22.02))[0])

    # Sketch27 → Cut-Extrude14 (cut)
    with BuildSketch(Plane(origin=(0, 0, 0), x_dir=(1, 0, 0), z_dir=(0, 1, 0))):
        with Locations((0, -22.5)):
            Rectangle(SKETCH27_W, SKETCH27_H)
    extrude(amount=-CUT_EXTRUDE14_DEPTH, mode=Mode.SUBTRACT)


with BuildPart() as cut_extrude13_piece_2:
    # of the separate pieces the step leaves, piece 2, a body of its own (cut_extrude13_pieces)
    add(cut_extrude10_piece_1_1.part.solids().sort_by_distance((-63.9, 0, -42.75))[0])


with BuildPart() as cut_extrude14_piece_1:
    # of the separate pieces the step leaves, piece 1, a body of its own (cut_extrude14_pieces)
    add(cut_extrude13_piece_1.part.solids().sort_by_distance((63.9, 0, -22.02))[0])

    # Sketch30 → #0-80 Tapped Hole2 (revolve, cut)
    with BuildSketch(Plane(origin=(62.3125, 0, -5), x_dir=(0, 0, 1), z_dir=(1, 0, 0))):
        Polygon((0, 0), (0, 8.287890611), (0.59563, 7.93), (0.59563, 0), align=None)
    f_0_80_tapped_hole2 = revolve(axis=Axis((62.3125, 6.35, -5), (0, -1, 0)), mode=Mode.SUBTRACT)

    # #0-80 Tapped Hole2 at 2: #0-80 Tapped Hole2 ×2
    with Locations(*[(0, 0, i * F_0_80_TAPPED_HOLE2_AT_2_PITCH) for i in range(1, F_0_80_TAPPED_HOLE2_AT_2_COUNT)]):
        add(f_0_80_tapped_hole2, mode=Mode.SUBTRACT)


with BuildPart() as cut_extrude14_piece_2:
    # of the separate pieces the step leaves, piece 2, a body of its own (cut_extrude14_pieces)
    add(cut_extrude13_piece_1.part.solids().sort_by_distance((63.9, 0, 22.98))[0])


with BuildPart() as cut_extrude15_tool:
    # Sketch29 → Cut-Extrude15 (new body)
    with BuildSketch(Plane.XZ.offset(3.175)):
        with Locations((62.3125, -32.865)):
            Rectangle(SKETCH29_W, SKETCH29_H)
        with Locations((62.3125, 32.865)):
            Rectangle(SKETCH29_W, SKETCH29_H)
    cut_extrude15 = extrude(amount=-CUT_EXTRUDE15_DEPTH)


with BuildPart() as cut_extrude13_piece_2_1:
    add(cut_extrude13_piece_2.part)

    # Cut-Extrude15: cut by cut_extrude15_tool
    add(cut_extrude15_tool.part, mode=Mode.SUBTRACT)


with BuildPart() as cut_extrude14_piece_2_1:
    add(cut_extrude14_piece_2.part)

    # Cut-Extrude15: cut by cut_extrude15_tool
    add(cut_extrude15_tool.part, mode=Mode.SUBTRACT)


with BuildPart() as cut_extrude16_tool:
    # Sketch36 → Cut-Extrude16 (new body)
    with BuildSketch(Plane.XZ.offset(2.355)):
        with Locations(Location((62.3125, 37.98, 0), (0, 0, 270))):
            Circle(SKETCH36_R)
        with Locations(Location((62.3125, 25.98, 0), (0, 0, 270))):
            Circle(SKETCH36_R)
        with Locations(Location((62.3125, -25.98, 0), (0, 0, 270))):
            Circle(SKETCH36_R)
        with Locations(Location((62.3125, -37.98, 0), (0, 0, 270))):
            Circle(SKETCH36_R)
    cut_extrude16 = extrude(amount=-CUT_EXTRUDE16_DEPTH)


with BuildPart() as cut_extrude13_piece_2_2:
    add(cut_extrude13_piece_2_1.part)

    # Cut-Extrude16: cut by cut_extrude16_tool
    add(cut_extrude16_tool.part, mode=Mode.SUBTRACT)


with BuildPart() as cut_extrude14_piece_2_2:
    add(cut_extrude14_piece_2_1.part)

    # Cut-Extrude16: cut by cut_extrude16_tool
    add(cut_extrude16_tool.part, mode=Mode.SUBTRACT)


with BuildPart() as mirror20_tool:
    # Mirror20: Cut-Extrude15, #0-80 Tapped Hole2, Cut-Extrude16 across plane
    add(cut_extrude15.mirror(Plane(origin=(0, 0, 0), x_dir=(0, 0, 1), z_dir=(1, 0, 0))))
    add(f_0_80_tapped_hole2.mirror(Plane(origin=(0, 0, 0), x_dir=(0, 0, 1), z_dir=(1, 0, 0))))
    add(cut_extrude16.mirror(Plane(origin=(0, 0, 0), x_dir=(0, 0, 1), z_dir=(1, 0, 0))))


with BuildPart() as cut_extrude13_piece_2_3:
    add(cut_extrude13_piece_2_2.part)

    # Mirror20: cut by mirror20_tool
    add(mirror20_tool.part, mode=Mode.SUBTRACT)

    # Fillet2
    fillet2_edges = [cut_extrude13_piece_2_3.edges().sort_by_distance(p)[0] for p in [
        (-63.9, -1.1775, -42.75),
        (63.9, -1.1775, -42.75),
    ]]
    fillet(fillet2_edges, radius=FILLET2_R)

    # Sketch28 → Boss-Extrude3 (add)
    with BuildSketch(Plane(origin=(0, 0, 0), x_dir=(1, 0, 0), z_dir=(0, 1, 0))):
        with BuildLine():
            Line((-36.675, 40), (-51.725, 40))
            ThreePointArc((-51.725, 40), (-55.737830983, 38.337830983), (-57.4, 34.325))
            Line((-57.4, 34.325), (-57.4, 31.5))
            add(Edge.make_bspline(
                [(-57.4, 31.5), (-57.4, 30.821154279), (-57.153175896, 29.447143081), (-56.167212938, 27.665270484), (-54.756272745, 26.202813776), (-52.455453984, 24.642995601), (-48.951428942, 23.350815489), (-44.2, 22.824592255), (-39.448571058, 23.350815489), (-35.944546016, 24.642995601), (-34.049903108, 25.927450724), (-33.266838465, 26.626794184), (-33.008008702, 26.88800086), (-32.892921678, 27.01127891)],
                knots=[0, 0, 0, 0, 0.196349541, 0.392699082, 0.589048623, 0.785398163, 1.178097245, 1.570796327, 1.963495408, 2.35619449, 2.552544031, 2.61024303, 2.659330415, 2.659330415, 2.659330415, 2.659330415], degree=3))
            ThreePointArc((-32.892921678, 27.01127891), (-30.7, 27.964062625), (-28.507078322, 27.01127891))
            add(Edge.make_bspline(
                [(-28.507078322, 27.01127891), (-28.391991298, 26.88800086), (-28.133161535, 26.626794184), (-27.350096892, 25.927450724), (-25.455453984, 24.642995601), (-21.951428942, 23.350815489), (-17.2, 22.824592255), (-12.448571058, 23.350815489), (-8.944546016, 24.642995601), (-6.643727255, 26.202813776), (-5.232787062, 27.665270484), (-4.246824104, 29.447143081), (-4, 30.821154279), (-4, 31.5)],
                knots=[0.482262239, 0.482262239, 0.482262239, 0.482262239, 0.531349624, 0.589048623, 0.785398163, 1.178097245, 1.570796327, 1.963495408, 2.35619449, 2.552544031, 2.748893572, 2.945243113, 3.141592654, 3.141592654, 3.141592654, 3.141592654], degree=3))
            Line((-4, 31.5), (-4, 34.325))
            ThreePointArc((-4, 34.325), (-5.662169017, 38.337830983), (-9.675, 40))
            Line((-9.675, 40), (-24.725, 40))
            ThreePointArc((-24.725, 40), (-26.829389725, 39.595405002), (-28.633717579, 38.439310621))
            ThreePointArc((-28.633717579, 38.439310621), (-30.7, 37.614276588), (-32.766282421, 38.439310621))
            ThreePointArc((-32.766282421, 38.439310621), (-34.570610275, 39.595405002), (-36.675, 40))
        make_face()
        with BuildLine():
            Line((-33.5, 31.5), (-33.5, 34.325))
            ThreePointArc((-33.5, 34.325), (-34.42993597, 36.57006403), (-36.675, 37.5))
            Line((-36.675, 37.5), (-51.725, 37.5))
            ThreePointArc((-51.725, 37.5), (-53.97006403, 36.57006403), (-54.9, 34.325))
            Line((-54.9, 34.325), (-54.9, 31.5))
            add(Edge.make_bspline(
                [(-54.9, 31.5), (-54.9, 25.5), (-44.2, 25.5), (-33.5, 25.5), (-33.5, 31.5)],
                knots=[0, 0, 0, 1.570796327, 1.570796327, 3.141592654, 3.141592654, 3.141592654], degree=2, weights=[1, 0.707106781, 1, 0.707106781, 1]))
        make_face(mode=Mode.SUBTRACT)
        with BuildLine():
            Line((-9.675, 37.5), (-24.725, 37.5))
            ThreePointArc((-24.725, 37.5), (-26.97006403, 36.57006403), (-27.9, 34.325))
            Line((-27.9, 34.325), (-27.9, 31.5))
            add(Edge.make_bspline(
                [(-27.9, 31.5), (-27.9, 25.5), (-17.2, 25.5), (-6.5, 25.5), (-6.5, 31.5)],
                knots=[0, 0, 0, 1.570796327, 1.570796327, 3.141592654, 3.141592654, 3.141592654], degree=2, weights=[1, 0.707106781, 1, 0.707106781, 1]))
            Line((-6.5, 31.5), (-6.5, 34.325))
            ThreePointArc((-6.5, 34.325), (-7.42993597, 36.57006403), (-9.675, 37.5))
        make_face(mode=Mode.SUBTRACT)
    extrude(amount=BOSS_EXTRUDE3_DEPTH)


with BuildPart() as cut_extrude14_piece_1_1:
    add(cut_extrude14_piece_1.part)

    # Mirror20: cut by mirror20_tool
    add(mirror20_tool.part, mode=Mode.SUBTRACT)

    # Mirror20 copy 1 sketch → Mirror20 copy 1 (revolve, cut)
    with BuildSketch(Plane(origin=(-62.3125, 0, 5), x_dir=(0, 0, 1), z_dir=(-1, 0, 0))):
        Polygon((0, 0), (0, -8.287890611), (0.59563, -7.93), (0.59563, 0), align=None)
    revolve(axis=Axis((-62.3125, 6.35, 5), (0, 1, 0)), mode=Mode.SUBTRACT)

    # Sketch37 → #0-80 Tapped Hole5 (revolve, cut)
    with BuildSketch(Plane(origin=(0, 0, -5), x_dir=(0, 0, 1), z_dir=(1, 0, 0))):
        Polygon((0, 0), (0, 8.287890611), (0.59563, 7.93), (0.59563, 0), align=None)
    f_0_80_tapped_hole5 = revolve(axis=Axis((0, 6.35, -5), (0, -1, 0)), mode=Mode.SUBTRACT)

    # #0-80 Tapped Hole5 at 2: #0-80 Tapped Hole5 ×2
    with Locations(*[(0, 0, i * F_0_80_TAPPED_HOLE5_AT_2_PITCH) for i in range(1, F_0_80_TAPPED_HOLE5_AT_2_COUNT)]):
        add(f_0_80_tapped_hole5, mode=Mode.SUBTRACT)


with BuildPart() as cut_extrude14_piece_2_3:
    add(cut_extrude14_piece_2_2.part)

    # Mirror20: cut by mirror20_tool
    add(mirror20_tool.part, mode=Mode.SUBTRACT)

    # Fillet3
    fillet3_edges = [cut_extrude14_piece_2_3.edges().sort_by_distance(p)[0] for p in [
        (63.9, -1.1775, 42.75),
        (-63.9, -1.1775, 42.75),
    ]]
    fillet(fillet3_edges, radius=FILLET3_R)


with BuildPart() as cut_extrude17_tool:
    # Sketch39 → Cut-Extrude17 (new body)
    with BuildSketch(Plane(origin=(0, 0, 0), x_dir=(1, 0, 0), z_dir=(0, 1, 0))):
        with Locations((1.301429901, 2.173123287)):
            Rectangle(SKETCH39_W, SKETCH39_H)
    extrude(amount=-CUT_EXTRUDE17_DEPTH)


with BuildPart() as cut_extrude13_piece_2_4:
    add(cut_extrude13_piece_2_3.part)

    # Cut-Extrude17: cut by cut_extrude17_tool
    add(cut_extrude17_tool.part, mode=Mode.SUBTRACT)

    # Sketch41 → Boss-Extrude4 (add)
    with BuildSketch(Plane(origin=(0, 0.79375, 0), x_dir=(1, 0, 0), z_dir=(0, 1, 0))):
        with BuildLine():
            Line((-36.675, 40), (-51.725, 40))
            ThreePointArc((-51.725, 40), (-55.737830983, 38.337830983), (-57.4, 34.325))
            Line((-57.4, 34.325), (-57.4, 31.5))
            add(Edge.make_bspline(
                [(-57.4, 31.5), (-57.4, 30.821154279), (-57.153175896, 29.447143081), (-56.167212938, 27.665270484), (-54.756272745, 26.202813776), (-52.455453984, 24.642995601), (-48.951428942, 23.350815489), (-44.2, 22.824592255), (-39.448571058, 23.350815489), (-35.944546016, 24.642995601), (-34.049903108, 25.927450724), (-33.266838465, 26.626794184), (-33.008008702, 26.88800086), (-32.892921678, 27.01127891)],
                knots=[0, 0, 0, 0, 0.196349541, 0.392699082, 0.589048623, 0.785398163, 1.178097245, 1.570796327, 1.963495408, 2.35619449, 2.552544031, 2.61024303, 2.659330415, 2.659330415, 2.659330415, 2.659330415], degree=3))
            ThreePointArc((-32.892921678, 27.01127891), (-30.7, 27.964062625), (-28.507078322, 27.01127891))
            add(Edge.make_bspline(
                [(-28.507078322, 27.01127891), (-28.391991298, 26.88800086), (-28.133161535, 26.626794184), (-27.350096892, 25.927450724), (-25.455453984, 24.642995601), (-21.951428942, 23.350815489), (-17.2, 22.824592255), (-12.448571058, 23.350815489), (-8.944546016, 24.642995601), (-6.643727255, 26.202813776), (-5.232787062, 27.665270484), (-4.246824104, 29.447143081), (-4, 30.821154279), (-4, 31.5)],
                knots=[0.482262239, 0.482262239, 0.482262239, 0.482262239, 0.531349624, 0.589048623, 0.785398163, 1.178097245, 1.570796327, 1.963495408, 2.35619449, 2.552544031, 2.748893572, 2.945243113, 3.141592654, 3.141592654, 3.141592654, 3.141592654], degree=3))
            Line((-4, 31.5), (-4, 34.325))
            ThreePointArc((-4, 34.325), (-5.662169017, 38.337830983), (-9.675, 40))
            Line((-9.675, 40), (-24.725, 40))
            ThreePointArc((-24.725, 40), (-26.829389725, 39.595405002), (-28.633717579, 38.439310621))
            ThreePointArc((-28.633717579, 38.439310621), (-30.7, 37.614276588), (-32.766282421, 38.439310621))
            ThreePointArc((-32.766282421, 38.439310621), (-34.570610275, 39.595405002), (-36.675, 40))
        make_face()
    extrude(amount=BOSS_EXTRUDE4_DEPTH)

    # Sketch42 → Cut-Extrude18 (cut)
    with BuildSketch(Plane.XZ.offset(-0.79375)):
        with Locations((-30.109683061, -33.262507806)):
            Rectangle(SKETCH42_W, SKETCH42_H)
    extrude(amount=CUT_EXTRUDE18_DEPTH, mode=Mode.SUBTRACT)


with BuildPart() as cut_extrude14_piece_1_2:
    add(cut_extrude14_piece_1_1.part)

    # Cut-Extrude17: cut by cut_extrude17_tool
    add(cut_extrude17_tool.part, mode=Mode.SUBTRACT)


with BuildPart() as cut_extrude14_piece_2_4:
    add(cut_extrude14_piece_2_3.part)

    # Cut-Extrude17: cut by cut_extrude17_tool
    add(cut_extrude17_tool.part, mode=Mode.SUBTRACT)


solid = cut_extrude13_piece_2_4.part
